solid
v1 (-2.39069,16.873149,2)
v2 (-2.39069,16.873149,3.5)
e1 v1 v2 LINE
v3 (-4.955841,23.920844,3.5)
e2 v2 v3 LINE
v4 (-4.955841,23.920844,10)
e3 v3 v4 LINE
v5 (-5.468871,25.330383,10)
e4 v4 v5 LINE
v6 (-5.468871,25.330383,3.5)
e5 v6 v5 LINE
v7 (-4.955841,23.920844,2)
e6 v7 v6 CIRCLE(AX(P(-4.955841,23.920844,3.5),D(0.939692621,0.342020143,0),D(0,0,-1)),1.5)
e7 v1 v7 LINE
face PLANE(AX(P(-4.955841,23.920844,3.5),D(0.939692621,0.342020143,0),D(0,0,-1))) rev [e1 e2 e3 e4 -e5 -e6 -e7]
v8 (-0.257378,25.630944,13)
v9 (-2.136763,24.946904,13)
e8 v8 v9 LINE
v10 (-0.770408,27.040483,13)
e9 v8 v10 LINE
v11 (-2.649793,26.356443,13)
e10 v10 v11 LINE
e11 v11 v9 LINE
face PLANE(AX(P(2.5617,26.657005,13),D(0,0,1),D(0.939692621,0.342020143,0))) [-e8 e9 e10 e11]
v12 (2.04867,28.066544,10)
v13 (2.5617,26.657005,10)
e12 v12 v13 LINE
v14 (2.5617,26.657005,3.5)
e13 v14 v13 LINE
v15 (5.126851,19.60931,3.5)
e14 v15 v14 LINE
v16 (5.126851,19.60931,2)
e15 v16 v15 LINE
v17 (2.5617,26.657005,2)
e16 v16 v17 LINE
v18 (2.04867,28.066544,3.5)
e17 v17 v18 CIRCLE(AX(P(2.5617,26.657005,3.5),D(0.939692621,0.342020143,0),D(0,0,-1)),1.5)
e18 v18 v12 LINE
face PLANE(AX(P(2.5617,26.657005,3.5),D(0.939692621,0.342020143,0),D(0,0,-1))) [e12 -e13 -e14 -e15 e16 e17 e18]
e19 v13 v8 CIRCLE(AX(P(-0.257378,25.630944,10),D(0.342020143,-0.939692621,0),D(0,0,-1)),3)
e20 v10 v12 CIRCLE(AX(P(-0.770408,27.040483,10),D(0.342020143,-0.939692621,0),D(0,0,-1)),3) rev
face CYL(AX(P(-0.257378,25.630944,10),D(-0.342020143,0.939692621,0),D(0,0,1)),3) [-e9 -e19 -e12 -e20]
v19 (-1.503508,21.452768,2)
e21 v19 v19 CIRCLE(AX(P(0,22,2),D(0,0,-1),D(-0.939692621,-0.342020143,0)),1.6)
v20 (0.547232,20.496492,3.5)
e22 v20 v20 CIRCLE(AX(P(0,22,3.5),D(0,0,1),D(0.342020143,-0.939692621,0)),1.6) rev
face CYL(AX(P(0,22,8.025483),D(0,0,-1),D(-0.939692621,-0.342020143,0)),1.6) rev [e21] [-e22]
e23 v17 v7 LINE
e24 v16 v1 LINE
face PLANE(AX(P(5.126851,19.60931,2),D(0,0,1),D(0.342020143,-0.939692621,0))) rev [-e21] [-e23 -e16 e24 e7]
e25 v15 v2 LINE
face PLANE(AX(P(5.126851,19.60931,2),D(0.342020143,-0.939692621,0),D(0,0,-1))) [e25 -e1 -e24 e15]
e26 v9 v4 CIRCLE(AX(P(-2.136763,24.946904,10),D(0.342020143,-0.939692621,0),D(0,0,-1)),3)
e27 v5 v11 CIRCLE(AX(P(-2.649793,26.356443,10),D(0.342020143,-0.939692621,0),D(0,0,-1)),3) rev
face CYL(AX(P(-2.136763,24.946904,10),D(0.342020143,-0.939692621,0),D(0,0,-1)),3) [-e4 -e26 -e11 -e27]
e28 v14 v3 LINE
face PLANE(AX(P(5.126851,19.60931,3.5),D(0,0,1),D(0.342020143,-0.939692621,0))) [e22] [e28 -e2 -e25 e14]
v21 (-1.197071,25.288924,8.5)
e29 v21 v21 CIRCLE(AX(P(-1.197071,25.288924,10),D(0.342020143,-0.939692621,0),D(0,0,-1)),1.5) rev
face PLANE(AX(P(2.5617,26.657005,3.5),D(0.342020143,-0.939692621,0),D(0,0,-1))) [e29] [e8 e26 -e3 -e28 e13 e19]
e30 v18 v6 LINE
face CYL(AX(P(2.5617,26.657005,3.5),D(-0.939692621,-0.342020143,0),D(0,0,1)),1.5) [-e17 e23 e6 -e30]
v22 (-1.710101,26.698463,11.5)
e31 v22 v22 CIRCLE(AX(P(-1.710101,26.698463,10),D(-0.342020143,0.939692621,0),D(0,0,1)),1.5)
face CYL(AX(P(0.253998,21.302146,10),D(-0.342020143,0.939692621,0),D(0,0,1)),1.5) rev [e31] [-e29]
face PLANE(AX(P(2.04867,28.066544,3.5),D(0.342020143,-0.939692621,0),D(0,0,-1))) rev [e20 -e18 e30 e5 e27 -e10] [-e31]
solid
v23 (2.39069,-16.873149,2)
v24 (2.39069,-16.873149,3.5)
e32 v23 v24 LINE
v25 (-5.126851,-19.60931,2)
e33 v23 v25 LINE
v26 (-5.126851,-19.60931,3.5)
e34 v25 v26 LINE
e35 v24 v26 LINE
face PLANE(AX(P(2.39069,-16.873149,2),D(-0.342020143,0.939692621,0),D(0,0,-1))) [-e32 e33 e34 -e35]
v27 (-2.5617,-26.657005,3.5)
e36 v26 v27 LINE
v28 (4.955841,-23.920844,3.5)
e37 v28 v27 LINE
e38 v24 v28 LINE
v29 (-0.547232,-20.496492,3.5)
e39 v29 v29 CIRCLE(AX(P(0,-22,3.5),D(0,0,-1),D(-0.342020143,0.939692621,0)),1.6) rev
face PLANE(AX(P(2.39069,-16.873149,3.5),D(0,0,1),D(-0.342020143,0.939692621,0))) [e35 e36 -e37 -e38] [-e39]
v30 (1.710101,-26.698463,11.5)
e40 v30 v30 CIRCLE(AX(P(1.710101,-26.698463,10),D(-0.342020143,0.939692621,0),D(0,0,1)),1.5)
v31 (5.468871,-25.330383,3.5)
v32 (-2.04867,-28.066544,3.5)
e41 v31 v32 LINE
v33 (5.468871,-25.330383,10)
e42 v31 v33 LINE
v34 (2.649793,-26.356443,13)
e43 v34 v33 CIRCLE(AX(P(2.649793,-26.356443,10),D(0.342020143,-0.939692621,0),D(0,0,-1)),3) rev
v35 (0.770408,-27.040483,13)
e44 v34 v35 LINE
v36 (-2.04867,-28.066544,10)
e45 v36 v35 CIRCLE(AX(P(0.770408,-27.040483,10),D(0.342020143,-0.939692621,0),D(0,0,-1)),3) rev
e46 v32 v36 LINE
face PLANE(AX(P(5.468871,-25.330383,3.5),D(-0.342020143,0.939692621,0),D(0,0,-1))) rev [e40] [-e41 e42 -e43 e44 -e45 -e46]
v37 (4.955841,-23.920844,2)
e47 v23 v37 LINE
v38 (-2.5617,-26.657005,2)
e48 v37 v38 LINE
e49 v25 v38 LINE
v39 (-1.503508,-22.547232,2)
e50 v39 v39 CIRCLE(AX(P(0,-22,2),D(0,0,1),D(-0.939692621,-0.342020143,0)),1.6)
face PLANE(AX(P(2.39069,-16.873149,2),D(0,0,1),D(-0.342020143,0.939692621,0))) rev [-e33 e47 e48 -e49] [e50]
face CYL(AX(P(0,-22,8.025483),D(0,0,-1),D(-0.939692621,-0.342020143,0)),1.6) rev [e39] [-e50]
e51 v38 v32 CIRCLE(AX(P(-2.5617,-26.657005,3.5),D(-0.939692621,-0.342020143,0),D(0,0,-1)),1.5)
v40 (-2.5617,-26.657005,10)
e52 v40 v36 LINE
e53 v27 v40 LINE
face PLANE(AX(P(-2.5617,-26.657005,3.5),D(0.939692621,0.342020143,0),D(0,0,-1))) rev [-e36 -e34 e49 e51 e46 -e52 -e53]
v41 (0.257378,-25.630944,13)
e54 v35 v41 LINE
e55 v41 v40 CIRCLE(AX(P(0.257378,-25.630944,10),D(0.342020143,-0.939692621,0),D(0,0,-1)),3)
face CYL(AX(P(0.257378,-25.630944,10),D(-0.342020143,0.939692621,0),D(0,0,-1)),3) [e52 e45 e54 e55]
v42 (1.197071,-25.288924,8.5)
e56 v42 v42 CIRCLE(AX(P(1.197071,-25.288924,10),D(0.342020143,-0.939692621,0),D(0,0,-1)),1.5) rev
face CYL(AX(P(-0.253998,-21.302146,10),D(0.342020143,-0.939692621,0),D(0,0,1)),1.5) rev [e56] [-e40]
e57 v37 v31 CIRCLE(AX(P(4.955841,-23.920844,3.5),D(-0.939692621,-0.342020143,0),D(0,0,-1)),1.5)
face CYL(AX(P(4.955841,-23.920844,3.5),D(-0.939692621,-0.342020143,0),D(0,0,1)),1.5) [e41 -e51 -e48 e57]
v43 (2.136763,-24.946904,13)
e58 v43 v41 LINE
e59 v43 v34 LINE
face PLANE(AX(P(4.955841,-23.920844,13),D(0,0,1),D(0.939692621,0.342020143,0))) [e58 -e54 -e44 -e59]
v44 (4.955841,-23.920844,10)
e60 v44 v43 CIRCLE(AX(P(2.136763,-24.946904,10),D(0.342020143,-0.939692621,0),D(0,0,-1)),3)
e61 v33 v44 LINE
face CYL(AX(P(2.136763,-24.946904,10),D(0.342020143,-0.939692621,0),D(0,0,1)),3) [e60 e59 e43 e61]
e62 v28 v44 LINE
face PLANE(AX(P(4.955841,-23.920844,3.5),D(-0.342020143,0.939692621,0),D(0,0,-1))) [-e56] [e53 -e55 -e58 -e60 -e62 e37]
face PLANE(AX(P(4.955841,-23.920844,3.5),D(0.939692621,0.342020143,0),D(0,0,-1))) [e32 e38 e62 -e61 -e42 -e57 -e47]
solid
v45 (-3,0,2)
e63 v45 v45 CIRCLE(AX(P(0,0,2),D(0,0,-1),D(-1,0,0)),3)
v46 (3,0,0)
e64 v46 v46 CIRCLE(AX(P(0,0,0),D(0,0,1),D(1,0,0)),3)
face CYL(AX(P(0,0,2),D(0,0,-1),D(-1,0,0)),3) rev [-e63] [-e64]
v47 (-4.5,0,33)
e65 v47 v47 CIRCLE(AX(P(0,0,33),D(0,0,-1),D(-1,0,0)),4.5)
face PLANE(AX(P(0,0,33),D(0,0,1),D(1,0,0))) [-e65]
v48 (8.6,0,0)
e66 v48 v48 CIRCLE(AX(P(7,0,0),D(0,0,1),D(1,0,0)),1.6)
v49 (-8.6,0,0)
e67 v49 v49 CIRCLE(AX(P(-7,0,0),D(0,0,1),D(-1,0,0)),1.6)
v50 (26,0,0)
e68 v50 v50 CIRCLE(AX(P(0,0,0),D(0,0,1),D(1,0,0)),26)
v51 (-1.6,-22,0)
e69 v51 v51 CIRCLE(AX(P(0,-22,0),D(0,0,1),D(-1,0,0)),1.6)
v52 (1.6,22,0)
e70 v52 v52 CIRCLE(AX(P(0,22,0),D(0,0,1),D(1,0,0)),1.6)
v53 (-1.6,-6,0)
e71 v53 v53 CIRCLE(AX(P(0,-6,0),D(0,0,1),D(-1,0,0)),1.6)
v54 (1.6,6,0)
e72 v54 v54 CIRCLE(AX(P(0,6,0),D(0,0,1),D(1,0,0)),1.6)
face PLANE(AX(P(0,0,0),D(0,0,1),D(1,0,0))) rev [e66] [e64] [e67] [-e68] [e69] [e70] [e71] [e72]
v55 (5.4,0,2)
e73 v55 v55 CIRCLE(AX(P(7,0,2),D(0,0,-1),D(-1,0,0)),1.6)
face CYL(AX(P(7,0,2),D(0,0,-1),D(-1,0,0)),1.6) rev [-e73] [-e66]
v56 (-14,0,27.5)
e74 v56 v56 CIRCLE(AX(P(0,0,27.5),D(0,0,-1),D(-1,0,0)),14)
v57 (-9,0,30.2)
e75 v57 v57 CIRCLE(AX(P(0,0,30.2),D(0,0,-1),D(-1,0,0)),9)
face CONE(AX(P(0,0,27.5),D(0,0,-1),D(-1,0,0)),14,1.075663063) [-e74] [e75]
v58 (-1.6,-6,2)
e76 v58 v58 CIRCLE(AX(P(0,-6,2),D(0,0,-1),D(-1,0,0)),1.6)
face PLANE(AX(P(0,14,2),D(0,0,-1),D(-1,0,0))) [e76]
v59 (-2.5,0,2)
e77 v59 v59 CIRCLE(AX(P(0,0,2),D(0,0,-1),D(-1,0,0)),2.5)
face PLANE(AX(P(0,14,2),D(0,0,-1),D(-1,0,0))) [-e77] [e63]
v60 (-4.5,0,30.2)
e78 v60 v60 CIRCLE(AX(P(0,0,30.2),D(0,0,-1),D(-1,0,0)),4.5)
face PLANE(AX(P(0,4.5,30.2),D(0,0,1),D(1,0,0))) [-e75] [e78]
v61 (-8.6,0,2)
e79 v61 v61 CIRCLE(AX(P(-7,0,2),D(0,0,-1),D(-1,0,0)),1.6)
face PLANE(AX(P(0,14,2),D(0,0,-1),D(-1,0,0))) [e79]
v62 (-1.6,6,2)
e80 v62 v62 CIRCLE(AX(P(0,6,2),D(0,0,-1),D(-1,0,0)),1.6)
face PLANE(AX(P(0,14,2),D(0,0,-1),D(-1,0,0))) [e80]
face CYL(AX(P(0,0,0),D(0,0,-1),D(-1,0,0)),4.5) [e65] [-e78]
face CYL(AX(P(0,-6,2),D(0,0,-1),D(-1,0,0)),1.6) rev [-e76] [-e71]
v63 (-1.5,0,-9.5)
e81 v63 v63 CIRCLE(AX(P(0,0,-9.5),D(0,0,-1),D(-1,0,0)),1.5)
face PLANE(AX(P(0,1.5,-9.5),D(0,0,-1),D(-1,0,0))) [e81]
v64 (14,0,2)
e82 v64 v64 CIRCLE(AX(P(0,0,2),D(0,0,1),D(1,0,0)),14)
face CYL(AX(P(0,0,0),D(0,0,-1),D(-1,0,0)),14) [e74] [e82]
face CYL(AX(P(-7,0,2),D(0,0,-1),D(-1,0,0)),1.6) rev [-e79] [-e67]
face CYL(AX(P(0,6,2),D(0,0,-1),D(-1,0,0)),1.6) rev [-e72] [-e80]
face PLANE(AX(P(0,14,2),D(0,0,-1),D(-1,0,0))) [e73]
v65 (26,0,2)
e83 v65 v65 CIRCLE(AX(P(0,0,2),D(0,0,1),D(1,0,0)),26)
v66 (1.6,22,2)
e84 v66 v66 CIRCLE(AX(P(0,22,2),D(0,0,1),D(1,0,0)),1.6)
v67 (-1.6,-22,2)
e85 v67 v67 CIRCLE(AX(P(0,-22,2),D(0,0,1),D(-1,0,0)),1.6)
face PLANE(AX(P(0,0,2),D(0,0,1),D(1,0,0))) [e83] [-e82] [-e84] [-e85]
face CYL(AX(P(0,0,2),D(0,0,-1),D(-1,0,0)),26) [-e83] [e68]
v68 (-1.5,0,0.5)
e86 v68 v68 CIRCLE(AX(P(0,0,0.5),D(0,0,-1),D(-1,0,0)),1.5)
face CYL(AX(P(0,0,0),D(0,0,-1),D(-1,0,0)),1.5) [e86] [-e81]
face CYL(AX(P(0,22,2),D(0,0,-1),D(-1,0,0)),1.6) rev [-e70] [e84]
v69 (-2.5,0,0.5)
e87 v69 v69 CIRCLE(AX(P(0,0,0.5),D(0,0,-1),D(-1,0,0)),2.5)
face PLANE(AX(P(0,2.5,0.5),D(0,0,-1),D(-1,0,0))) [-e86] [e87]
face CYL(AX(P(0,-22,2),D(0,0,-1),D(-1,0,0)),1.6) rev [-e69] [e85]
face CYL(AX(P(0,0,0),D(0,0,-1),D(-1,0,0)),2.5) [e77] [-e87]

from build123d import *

# Parameters (mm, degrees)
SKICA1_R                        = 26
SKICA1_R_2                      = 3
SKICA1_R_3                      = 1.6
P_IDAT_VYSUNUT_M1_DEPTH         = 2
VYSUNOUT_TENKOST_NN_1_DEPTH     = 4
SKICA4_R                        = 1.6
ODEBRAT_VYSUNUT_M1_DEPTH        = 1.5
SKICA5_R                        = 1.5
ODEBRAT_VYSUNUT_M2_DEPTH        = 1.5
ZAOBLIT1_R                      = 3
T_LO_P_ESUNOUT_KOP_ROVAT1_ANGLE = 20
T_LO_P_ESUNOUT_KOP_ROVAT2_ANGLE = 20


with BuildPart() as part:
    # Skica1 → Přidat vysunutím1 (new body)
    with BuildSketch(Plane.XY):
        Circle(SKICA1_R)
        Circle(SKICA1_R_2, mode=Mode.SUBTRACT)
        with Locations((7, 0)):
            Circle(SKICA1_R_3, mode=Mode.SUBTRACT)
        with Locations((0, 6)):
            Circle(SKICA1_R_3, mode=Mode.SUBTRACT)
        with Locations(Location((0, -6, 0), (0, 0, 180))):
            Circle(SKICA1_R_3, mode=Mode.SUBTRACT)
        with Locations(Location((-7, 0, 0), (0, 0, 180))):
            Circle(SKICA1_R_3, mode=Mode.SUBTRACT)
        with Locations((0, 22)):
            Circle(SKICA1_R_3, mode=Mode.SUBTRACT)
        with Locations(Location((0, -22, 0), (0, 0, 180))):
            Circle(SKICA1_R_3, mode=Mode.SUBTRACT)
    extrude(amount=P_IDAT_VYSUNUT_M1_DEPTH)

    # Skica2 → Rotovat1 (revolve)
    with BuildSketch(Plane(origin=(0, 0, 0), x_dir=(0, 0, -1), z_dir=(1, 0, 0)), mode=Mode.PRIVATE) as rotovat1_sk:
        Polygon((-33, 0), (-33, 4.5), (-30.2, 4.5), (-30.2, 9), (-27.5, 14), (-2, 14), (-2, 2.5), (-0.5, 2.5), (-0.5, 1.5), (9.5, 1.5), (9.5, 0), align=None)
    revolve(rotovat1_sk.sketch.rotate(Axis((0, 0, 0), (0, 0, 1)), 90), axis=Axis((0, 0, 0), (0, 0, 1)))


with BuildPart() as body_2:
    # Skica3 → Vysunout tenkostěnný1 (new, symmetric)
    with BuildSketch(Plane(origin=(0, 0, 0), x_dir=(0, 0, -1), z_dir=(1, 0, 0))):
        with BuildLine():
            Line((-2, 18), (-2, 25.5))
            ThreePointArc((-2, 25.5), (-2.439339828, 26.560660172), (-3.5, 27))
            Line((-3.5, 27), (-13, 27))
            Line((-13, 27), (-13, 25.5))
            Line((-13, 25.5), (-3.5, 25.5))
            Line((-3.5, 25.5), (-3.5, 18))
            Line((-3.5, 18), (-2, 18))
        make_face()
    extrude(amount=VYSUNOUT_TENKOST_NN_1_DEPTH, both=True)

    # Skica4 → Odebrat vysunutím1 (cut)
    with BuildSketch(Plane(origin=(0, 0, 2), x_dir=(-1, 0, 0), z_dir=(0, 0, -1))):
        with Locations((0, 22)):
            Circle(SKICA4_R)
    extrude(amount=-ODEBRAT_VYSUNUT_M1_DEPTH, mode=Mode.SUBTRACT)

    # Skica5 → Odebrat vysunutím2 (cut)
    with BuildSketch(Plane(origin=(0, 27, 0), x_dir=(1, 0, 0), z_dir=(0, 1, 0))):
        with Locations(Location((0, -10, 0), (0, 0, 270))):
            Circle(SKICA5_R)
    extrude(amount=-ODEBRAT_VYSUNUT_M2_DEPTH, mode=Mode.SUBTRACT)

    # Zaoblit1
    zaoblit1_edges = [body_2.edges().sort_by_distance(p)[0] for p in [
        (4, 26.25, 13),
        (-4, 26.25, 13),
    ]]
    fillet(zaoblit1_edges, radius=ZAOBLIT1_R)


with BuildPart() as body_3:
    # Zrcadlit1: mirrored copy
    add(body_2.part.mirror(Plane.ZX))


with BuildPart() as body_2_1:
    # Tělo-Přesunout/kopírovat1: read off the stored shape, not the designer's step
    # Tělo-Přesunout/kopírovat1: moved
    add(body_2.part.moved(Location((7.5244432, -1.3267623, 0))).rotate(Axis((0, 0, 0), (0, 0, 1)), T_LO_P_ESUNOUT_KOP_ROVAT1_ANGLE))


with BuildPart() as body_3_1:
    # Tělo-Přesunout/kopírovat2: read off the stored shape, not the designer's step
    # Tělo-Přesunout/kopírovat2: moved
    add(body_3.part.moved(Location((-7.5244432, 1.3267623, 0))).rotate(Axis((0, 0, 0), (0, 0, 1)), T_LO_P_ESUNOUT_KOP_ROVAT2_ANGLE))


solid = Compound([part.part, body_2_1.part, body_3_1.part])
